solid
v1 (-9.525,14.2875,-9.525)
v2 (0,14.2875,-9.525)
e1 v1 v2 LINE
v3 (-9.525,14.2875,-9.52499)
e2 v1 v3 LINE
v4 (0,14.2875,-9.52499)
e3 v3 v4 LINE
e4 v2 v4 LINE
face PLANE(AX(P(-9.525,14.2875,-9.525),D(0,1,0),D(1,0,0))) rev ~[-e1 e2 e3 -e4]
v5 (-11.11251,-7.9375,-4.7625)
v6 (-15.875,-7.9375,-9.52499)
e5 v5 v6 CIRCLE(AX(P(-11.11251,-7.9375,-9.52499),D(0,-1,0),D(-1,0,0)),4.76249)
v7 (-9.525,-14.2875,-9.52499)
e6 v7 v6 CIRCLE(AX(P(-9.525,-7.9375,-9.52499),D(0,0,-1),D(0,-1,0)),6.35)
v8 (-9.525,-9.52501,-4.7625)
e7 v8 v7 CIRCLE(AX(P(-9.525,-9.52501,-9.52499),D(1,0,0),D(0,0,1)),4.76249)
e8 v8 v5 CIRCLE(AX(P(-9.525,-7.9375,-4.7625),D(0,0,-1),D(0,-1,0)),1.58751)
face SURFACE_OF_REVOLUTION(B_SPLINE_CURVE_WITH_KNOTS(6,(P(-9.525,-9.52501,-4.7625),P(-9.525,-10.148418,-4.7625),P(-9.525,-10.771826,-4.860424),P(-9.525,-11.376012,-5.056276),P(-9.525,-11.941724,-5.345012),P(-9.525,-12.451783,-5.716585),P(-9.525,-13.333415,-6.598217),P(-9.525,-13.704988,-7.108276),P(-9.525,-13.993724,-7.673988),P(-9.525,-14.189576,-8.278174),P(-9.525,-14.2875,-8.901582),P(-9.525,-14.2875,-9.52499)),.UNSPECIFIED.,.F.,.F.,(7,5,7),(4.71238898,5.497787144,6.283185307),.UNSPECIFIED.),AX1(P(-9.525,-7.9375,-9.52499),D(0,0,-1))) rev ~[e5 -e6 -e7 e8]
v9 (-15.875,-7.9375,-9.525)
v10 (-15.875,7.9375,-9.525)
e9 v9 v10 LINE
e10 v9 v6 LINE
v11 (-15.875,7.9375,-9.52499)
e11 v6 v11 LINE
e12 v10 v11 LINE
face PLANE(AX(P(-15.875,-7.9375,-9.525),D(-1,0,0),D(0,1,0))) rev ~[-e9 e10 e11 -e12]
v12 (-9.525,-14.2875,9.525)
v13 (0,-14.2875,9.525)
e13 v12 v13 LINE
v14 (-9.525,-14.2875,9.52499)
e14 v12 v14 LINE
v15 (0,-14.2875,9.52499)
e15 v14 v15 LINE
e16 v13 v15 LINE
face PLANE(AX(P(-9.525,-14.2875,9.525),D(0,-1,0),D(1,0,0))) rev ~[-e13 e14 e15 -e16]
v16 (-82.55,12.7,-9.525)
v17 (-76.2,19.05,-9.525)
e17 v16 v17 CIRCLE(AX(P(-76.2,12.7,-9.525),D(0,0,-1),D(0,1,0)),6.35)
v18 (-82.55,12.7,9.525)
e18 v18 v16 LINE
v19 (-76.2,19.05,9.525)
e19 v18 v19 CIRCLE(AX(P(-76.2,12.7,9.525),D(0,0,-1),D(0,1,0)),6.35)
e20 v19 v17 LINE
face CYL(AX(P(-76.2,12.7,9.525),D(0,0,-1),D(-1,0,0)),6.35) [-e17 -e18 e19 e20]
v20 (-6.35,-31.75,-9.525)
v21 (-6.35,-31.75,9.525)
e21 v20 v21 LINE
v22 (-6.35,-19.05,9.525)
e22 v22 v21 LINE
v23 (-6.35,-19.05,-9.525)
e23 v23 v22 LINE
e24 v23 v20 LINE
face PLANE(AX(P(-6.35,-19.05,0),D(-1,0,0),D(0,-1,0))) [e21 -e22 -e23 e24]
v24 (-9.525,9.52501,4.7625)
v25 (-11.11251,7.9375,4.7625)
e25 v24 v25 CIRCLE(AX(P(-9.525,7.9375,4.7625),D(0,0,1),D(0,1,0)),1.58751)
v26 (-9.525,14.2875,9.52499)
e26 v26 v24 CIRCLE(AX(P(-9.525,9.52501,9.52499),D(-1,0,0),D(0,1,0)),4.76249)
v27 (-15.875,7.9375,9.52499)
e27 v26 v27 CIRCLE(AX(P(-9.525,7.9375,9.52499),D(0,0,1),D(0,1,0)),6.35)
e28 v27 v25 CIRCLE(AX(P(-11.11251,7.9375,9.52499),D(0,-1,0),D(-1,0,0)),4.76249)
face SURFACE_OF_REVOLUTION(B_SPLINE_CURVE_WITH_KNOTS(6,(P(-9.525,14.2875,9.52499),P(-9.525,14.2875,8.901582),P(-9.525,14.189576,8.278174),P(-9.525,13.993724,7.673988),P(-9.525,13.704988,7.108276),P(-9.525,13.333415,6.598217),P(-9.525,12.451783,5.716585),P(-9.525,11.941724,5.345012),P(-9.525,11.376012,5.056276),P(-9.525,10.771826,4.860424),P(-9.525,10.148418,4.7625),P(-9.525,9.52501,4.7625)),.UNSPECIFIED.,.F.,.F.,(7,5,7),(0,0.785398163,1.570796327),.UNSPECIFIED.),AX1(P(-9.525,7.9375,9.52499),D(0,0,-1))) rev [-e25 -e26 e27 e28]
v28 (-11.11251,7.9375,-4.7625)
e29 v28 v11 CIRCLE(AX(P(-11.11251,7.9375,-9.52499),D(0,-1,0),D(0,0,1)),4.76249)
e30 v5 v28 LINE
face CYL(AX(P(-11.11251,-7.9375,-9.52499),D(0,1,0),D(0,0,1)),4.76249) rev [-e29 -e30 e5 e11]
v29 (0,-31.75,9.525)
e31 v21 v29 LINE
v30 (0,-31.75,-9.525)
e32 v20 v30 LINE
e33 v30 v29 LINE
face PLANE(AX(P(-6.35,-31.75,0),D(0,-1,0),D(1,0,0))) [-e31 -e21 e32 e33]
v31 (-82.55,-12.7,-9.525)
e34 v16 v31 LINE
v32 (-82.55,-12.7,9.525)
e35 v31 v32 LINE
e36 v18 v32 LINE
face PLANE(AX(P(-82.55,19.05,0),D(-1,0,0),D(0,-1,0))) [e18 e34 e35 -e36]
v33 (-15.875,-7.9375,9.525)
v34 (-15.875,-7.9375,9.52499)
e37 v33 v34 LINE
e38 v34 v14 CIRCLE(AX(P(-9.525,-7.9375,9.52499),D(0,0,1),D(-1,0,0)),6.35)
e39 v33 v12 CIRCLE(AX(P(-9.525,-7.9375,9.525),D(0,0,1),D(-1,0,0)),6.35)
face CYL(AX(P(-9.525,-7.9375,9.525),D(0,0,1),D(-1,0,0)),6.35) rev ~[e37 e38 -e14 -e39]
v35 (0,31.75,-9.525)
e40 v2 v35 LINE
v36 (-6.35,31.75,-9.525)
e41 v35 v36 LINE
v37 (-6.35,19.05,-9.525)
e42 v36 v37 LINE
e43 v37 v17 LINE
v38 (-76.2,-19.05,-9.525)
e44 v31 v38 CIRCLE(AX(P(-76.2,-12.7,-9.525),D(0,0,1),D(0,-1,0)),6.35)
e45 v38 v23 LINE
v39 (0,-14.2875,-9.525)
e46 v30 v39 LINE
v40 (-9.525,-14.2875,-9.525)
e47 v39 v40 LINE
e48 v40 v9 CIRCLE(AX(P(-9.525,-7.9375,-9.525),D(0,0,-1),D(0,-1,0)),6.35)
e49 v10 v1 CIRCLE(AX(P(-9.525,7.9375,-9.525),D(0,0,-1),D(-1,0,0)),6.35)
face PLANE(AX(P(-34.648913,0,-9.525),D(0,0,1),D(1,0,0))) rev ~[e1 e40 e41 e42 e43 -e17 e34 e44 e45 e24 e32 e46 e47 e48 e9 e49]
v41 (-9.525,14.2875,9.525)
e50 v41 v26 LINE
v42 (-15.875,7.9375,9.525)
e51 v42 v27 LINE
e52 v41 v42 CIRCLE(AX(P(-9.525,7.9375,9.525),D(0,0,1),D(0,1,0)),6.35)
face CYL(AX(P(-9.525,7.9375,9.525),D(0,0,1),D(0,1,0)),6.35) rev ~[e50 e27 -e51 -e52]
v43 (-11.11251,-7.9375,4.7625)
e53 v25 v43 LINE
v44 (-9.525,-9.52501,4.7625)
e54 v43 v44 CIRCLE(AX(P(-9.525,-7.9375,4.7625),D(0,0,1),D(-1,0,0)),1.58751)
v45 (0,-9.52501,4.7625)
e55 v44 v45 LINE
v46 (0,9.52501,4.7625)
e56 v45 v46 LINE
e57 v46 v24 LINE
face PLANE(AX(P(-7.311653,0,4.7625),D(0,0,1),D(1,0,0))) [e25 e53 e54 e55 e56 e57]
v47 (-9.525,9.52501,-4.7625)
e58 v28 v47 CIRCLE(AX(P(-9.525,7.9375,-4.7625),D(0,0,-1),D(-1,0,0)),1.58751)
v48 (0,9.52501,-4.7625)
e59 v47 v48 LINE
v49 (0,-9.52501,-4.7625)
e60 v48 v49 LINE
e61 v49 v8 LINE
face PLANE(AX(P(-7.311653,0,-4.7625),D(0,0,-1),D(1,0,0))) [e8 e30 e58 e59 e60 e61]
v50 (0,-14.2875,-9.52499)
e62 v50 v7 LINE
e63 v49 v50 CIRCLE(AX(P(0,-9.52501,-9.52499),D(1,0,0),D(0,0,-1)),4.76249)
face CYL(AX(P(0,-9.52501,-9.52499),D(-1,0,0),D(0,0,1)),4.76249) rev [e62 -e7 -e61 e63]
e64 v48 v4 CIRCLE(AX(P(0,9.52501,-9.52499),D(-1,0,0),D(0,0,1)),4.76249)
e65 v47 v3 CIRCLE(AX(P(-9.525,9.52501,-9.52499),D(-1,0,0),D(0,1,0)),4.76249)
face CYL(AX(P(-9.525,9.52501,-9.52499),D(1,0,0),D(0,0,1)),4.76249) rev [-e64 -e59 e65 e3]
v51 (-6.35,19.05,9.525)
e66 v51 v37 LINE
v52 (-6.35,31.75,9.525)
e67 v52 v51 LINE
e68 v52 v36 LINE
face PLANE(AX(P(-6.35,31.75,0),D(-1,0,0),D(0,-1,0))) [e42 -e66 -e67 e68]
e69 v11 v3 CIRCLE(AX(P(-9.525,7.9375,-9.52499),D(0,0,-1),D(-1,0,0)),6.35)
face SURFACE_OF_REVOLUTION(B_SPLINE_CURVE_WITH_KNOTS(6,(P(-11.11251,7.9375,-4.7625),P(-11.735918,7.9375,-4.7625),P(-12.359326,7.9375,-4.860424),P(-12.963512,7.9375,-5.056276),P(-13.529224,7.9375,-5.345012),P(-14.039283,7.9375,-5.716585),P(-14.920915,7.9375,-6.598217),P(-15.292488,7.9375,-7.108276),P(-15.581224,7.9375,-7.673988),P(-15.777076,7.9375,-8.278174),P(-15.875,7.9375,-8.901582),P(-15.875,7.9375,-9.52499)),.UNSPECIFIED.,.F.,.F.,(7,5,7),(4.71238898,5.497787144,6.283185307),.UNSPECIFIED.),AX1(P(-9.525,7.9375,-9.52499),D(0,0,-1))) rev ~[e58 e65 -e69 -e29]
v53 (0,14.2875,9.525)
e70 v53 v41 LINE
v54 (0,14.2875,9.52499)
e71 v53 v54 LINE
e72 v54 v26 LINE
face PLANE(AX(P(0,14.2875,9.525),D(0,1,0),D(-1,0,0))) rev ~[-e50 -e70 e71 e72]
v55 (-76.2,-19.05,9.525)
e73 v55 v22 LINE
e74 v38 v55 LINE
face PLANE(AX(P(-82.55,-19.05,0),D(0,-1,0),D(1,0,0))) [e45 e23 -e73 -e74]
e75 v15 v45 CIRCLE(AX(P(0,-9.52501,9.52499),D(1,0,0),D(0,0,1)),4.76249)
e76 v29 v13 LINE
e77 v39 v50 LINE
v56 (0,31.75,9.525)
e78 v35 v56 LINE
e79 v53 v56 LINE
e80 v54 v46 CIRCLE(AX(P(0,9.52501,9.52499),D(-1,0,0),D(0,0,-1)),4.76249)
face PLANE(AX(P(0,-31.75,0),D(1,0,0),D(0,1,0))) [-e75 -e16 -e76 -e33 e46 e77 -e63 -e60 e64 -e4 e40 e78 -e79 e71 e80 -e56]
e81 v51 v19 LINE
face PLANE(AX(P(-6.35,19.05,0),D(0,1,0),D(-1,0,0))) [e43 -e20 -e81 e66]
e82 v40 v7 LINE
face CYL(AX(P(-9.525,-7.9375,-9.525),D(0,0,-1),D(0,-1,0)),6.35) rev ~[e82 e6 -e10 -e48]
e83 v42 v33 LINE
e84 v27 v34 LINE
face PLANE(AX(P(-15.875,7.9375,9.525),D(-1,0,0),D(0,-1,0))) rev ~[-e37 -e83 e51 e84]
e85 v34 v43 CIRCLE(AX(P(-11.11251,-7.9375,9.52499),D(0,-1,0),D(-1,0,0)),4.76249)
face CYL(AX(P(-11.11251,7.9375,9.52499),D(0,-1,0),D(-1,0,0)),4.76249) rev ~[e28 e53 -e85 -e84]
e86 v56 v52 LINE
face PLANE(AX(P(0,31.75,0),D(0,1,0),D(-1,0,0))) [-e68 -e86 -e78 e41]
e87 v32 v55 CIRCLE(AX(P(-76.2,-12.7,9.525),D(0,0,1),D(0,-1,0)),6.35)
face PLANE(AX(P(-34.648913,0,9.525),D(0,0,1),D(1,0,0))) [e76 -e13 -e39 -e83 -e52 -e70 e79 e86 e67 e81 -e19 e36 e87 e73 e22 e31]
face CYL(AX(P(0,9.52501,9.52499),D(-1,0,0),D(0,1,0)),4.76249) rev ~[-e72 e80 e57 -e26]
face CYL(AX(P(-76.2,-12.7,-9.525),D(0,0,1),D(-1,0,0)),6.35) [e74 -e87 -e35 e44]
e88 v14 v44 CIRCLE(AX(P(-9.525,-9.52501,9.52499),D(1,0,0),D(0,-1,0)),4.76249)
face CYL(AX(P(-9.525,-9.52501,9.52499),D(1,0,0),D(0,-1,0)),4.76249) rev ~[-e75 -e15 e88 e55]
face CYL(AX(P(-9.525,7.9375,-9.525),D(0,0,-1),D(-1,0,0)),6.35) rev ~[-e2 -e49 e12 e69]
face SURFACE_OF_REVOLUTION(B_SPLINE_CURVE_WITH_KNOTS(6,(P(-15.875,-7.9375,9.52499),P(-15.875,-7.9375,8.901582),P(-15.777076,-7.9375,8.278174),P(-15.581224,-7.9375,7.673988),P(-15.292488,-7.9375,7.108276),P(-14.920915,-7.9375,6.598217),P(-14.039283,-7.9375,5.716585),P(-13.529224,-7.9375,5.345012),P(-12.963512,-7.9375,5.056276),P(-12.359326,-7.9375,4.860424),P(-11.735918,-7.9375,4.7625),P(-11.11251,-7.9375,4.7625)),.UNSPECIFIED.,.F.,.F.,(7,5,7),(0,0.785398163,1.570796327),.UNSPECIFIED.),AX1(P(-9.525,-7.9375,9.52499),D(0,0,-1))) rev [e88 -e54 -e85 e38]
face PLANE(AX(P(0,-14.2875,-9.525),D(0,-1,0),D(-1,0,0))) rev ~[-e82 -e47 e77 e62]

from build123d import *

# Parameters (mm, degrees)
F1_DEPTH = 9.525
F2_R     = 6.35
F4_DEPTH = 4.7625
F5_R     = 4.76249
F7_DEPTH = 4.7625
F8_R     = 4.76249


# Not quite as in the source:
# - a fillet or chamfer is up to 0.001 mm smaller than in the source, because OpenCascade refuses the exact size


with BuildPart() as f1:
    # F0 (on Top) → F1 (new body, symmetric)
    with BuildSketch(Plane.XY):
        Polygon((-82.55, 19.05), (-82.55, -19.05), (-6.35, -19.05), (-6.35, -31.75), (0, -31.75), (0, 31.75), (-6.35, 31.75), (-6.35, 19.05), align=None)
    extrude(amount=F1_DEPTH, both=True)

    # F2
    f2_edges = [f1.edges().sort_by_distance(p)[0] for p in [
        (-82.55, -19.05, 0),
        (-82.55, 19.05, 0),
    ]]
    fillet(f2_edges, radius=F2_R)

    # F3 (on face) → F4 (cut)
    with BuildSketch(Plane.XY.offset(9.525)):
        with BuildLine():
            Line((0, -14.2875), (0, 14.2875))
            Line((0, 14.2875), (-9.525, 14.2875))
            ThreePointArc((-9.525, 14.2875), (-14.0151280605, 12.4276280605), (-15.875, 7.9375))
            Line((-15.875, 7.9375), (-15.875, -7.9375))
            ThreePointArc((-15.875, -7.9375), (-14.0151280605, -12.4276280605), (-9.525, -14.2875))
            Line((-9.525, -14.2875), (0, -14.2875))
        make_face()
    extrude(amount=-F4_DEPTH, mode=Mode.SUBTRACT)

    # F5 (radius 4.7625 in the source; OpenCascade refuses exactly that, so slightly less here)
    f5_edges = [f1.edges().sort_by_distance(p)[0] for p in [
        (-4.7625, 14.2875, 4.7625),
        (-14.015128, 12.427628, 4.7625),
    ]]
    fillet(f5_edges, radius=F5_R)

    # F6 (on face) → F7 (cut)
    with BuildSketch(Plane(origin=(0, 0, -9.525), x_dir=(1, 0, 0), z_dir=(0, 0, -1))):
        with BuildLine():
            Line((0, -14.2875), (0, 14.2875))
            Line((0, 14.2875), (-9.525, 14.2875))
            ThreePointArc((-9.525, 14.2875), (-14.0151280605, 12.4276280605), (-15.875, 7.9375))
            Line((-15.875, 7.9375), (-15.875, -7.9375))
            ThreePointArc((-15.875, -7.9375), (-14.0151280605, -12.4276280605), (-9.525, -14.2875))
            Line((-9.525, -14.2875), (0, -14.2875))
        make_face()
    extrude(amount=-F7_DEPTH, mode=Mode.SUBTRACT)

    # F8 (radius 4.7625 in the source; OpenCascade refuses exactly that, so slightly less here)
    f8_edges = [f1.edges().sort_by_distance(p)[0] for p in [
        (-4.7625, -14.2875, -4.7625),
        (-14.015128, -12.427628, -4.7625),
    ]]
    fillet(f8_edges, radius=F8_R)


solid = f1.part
